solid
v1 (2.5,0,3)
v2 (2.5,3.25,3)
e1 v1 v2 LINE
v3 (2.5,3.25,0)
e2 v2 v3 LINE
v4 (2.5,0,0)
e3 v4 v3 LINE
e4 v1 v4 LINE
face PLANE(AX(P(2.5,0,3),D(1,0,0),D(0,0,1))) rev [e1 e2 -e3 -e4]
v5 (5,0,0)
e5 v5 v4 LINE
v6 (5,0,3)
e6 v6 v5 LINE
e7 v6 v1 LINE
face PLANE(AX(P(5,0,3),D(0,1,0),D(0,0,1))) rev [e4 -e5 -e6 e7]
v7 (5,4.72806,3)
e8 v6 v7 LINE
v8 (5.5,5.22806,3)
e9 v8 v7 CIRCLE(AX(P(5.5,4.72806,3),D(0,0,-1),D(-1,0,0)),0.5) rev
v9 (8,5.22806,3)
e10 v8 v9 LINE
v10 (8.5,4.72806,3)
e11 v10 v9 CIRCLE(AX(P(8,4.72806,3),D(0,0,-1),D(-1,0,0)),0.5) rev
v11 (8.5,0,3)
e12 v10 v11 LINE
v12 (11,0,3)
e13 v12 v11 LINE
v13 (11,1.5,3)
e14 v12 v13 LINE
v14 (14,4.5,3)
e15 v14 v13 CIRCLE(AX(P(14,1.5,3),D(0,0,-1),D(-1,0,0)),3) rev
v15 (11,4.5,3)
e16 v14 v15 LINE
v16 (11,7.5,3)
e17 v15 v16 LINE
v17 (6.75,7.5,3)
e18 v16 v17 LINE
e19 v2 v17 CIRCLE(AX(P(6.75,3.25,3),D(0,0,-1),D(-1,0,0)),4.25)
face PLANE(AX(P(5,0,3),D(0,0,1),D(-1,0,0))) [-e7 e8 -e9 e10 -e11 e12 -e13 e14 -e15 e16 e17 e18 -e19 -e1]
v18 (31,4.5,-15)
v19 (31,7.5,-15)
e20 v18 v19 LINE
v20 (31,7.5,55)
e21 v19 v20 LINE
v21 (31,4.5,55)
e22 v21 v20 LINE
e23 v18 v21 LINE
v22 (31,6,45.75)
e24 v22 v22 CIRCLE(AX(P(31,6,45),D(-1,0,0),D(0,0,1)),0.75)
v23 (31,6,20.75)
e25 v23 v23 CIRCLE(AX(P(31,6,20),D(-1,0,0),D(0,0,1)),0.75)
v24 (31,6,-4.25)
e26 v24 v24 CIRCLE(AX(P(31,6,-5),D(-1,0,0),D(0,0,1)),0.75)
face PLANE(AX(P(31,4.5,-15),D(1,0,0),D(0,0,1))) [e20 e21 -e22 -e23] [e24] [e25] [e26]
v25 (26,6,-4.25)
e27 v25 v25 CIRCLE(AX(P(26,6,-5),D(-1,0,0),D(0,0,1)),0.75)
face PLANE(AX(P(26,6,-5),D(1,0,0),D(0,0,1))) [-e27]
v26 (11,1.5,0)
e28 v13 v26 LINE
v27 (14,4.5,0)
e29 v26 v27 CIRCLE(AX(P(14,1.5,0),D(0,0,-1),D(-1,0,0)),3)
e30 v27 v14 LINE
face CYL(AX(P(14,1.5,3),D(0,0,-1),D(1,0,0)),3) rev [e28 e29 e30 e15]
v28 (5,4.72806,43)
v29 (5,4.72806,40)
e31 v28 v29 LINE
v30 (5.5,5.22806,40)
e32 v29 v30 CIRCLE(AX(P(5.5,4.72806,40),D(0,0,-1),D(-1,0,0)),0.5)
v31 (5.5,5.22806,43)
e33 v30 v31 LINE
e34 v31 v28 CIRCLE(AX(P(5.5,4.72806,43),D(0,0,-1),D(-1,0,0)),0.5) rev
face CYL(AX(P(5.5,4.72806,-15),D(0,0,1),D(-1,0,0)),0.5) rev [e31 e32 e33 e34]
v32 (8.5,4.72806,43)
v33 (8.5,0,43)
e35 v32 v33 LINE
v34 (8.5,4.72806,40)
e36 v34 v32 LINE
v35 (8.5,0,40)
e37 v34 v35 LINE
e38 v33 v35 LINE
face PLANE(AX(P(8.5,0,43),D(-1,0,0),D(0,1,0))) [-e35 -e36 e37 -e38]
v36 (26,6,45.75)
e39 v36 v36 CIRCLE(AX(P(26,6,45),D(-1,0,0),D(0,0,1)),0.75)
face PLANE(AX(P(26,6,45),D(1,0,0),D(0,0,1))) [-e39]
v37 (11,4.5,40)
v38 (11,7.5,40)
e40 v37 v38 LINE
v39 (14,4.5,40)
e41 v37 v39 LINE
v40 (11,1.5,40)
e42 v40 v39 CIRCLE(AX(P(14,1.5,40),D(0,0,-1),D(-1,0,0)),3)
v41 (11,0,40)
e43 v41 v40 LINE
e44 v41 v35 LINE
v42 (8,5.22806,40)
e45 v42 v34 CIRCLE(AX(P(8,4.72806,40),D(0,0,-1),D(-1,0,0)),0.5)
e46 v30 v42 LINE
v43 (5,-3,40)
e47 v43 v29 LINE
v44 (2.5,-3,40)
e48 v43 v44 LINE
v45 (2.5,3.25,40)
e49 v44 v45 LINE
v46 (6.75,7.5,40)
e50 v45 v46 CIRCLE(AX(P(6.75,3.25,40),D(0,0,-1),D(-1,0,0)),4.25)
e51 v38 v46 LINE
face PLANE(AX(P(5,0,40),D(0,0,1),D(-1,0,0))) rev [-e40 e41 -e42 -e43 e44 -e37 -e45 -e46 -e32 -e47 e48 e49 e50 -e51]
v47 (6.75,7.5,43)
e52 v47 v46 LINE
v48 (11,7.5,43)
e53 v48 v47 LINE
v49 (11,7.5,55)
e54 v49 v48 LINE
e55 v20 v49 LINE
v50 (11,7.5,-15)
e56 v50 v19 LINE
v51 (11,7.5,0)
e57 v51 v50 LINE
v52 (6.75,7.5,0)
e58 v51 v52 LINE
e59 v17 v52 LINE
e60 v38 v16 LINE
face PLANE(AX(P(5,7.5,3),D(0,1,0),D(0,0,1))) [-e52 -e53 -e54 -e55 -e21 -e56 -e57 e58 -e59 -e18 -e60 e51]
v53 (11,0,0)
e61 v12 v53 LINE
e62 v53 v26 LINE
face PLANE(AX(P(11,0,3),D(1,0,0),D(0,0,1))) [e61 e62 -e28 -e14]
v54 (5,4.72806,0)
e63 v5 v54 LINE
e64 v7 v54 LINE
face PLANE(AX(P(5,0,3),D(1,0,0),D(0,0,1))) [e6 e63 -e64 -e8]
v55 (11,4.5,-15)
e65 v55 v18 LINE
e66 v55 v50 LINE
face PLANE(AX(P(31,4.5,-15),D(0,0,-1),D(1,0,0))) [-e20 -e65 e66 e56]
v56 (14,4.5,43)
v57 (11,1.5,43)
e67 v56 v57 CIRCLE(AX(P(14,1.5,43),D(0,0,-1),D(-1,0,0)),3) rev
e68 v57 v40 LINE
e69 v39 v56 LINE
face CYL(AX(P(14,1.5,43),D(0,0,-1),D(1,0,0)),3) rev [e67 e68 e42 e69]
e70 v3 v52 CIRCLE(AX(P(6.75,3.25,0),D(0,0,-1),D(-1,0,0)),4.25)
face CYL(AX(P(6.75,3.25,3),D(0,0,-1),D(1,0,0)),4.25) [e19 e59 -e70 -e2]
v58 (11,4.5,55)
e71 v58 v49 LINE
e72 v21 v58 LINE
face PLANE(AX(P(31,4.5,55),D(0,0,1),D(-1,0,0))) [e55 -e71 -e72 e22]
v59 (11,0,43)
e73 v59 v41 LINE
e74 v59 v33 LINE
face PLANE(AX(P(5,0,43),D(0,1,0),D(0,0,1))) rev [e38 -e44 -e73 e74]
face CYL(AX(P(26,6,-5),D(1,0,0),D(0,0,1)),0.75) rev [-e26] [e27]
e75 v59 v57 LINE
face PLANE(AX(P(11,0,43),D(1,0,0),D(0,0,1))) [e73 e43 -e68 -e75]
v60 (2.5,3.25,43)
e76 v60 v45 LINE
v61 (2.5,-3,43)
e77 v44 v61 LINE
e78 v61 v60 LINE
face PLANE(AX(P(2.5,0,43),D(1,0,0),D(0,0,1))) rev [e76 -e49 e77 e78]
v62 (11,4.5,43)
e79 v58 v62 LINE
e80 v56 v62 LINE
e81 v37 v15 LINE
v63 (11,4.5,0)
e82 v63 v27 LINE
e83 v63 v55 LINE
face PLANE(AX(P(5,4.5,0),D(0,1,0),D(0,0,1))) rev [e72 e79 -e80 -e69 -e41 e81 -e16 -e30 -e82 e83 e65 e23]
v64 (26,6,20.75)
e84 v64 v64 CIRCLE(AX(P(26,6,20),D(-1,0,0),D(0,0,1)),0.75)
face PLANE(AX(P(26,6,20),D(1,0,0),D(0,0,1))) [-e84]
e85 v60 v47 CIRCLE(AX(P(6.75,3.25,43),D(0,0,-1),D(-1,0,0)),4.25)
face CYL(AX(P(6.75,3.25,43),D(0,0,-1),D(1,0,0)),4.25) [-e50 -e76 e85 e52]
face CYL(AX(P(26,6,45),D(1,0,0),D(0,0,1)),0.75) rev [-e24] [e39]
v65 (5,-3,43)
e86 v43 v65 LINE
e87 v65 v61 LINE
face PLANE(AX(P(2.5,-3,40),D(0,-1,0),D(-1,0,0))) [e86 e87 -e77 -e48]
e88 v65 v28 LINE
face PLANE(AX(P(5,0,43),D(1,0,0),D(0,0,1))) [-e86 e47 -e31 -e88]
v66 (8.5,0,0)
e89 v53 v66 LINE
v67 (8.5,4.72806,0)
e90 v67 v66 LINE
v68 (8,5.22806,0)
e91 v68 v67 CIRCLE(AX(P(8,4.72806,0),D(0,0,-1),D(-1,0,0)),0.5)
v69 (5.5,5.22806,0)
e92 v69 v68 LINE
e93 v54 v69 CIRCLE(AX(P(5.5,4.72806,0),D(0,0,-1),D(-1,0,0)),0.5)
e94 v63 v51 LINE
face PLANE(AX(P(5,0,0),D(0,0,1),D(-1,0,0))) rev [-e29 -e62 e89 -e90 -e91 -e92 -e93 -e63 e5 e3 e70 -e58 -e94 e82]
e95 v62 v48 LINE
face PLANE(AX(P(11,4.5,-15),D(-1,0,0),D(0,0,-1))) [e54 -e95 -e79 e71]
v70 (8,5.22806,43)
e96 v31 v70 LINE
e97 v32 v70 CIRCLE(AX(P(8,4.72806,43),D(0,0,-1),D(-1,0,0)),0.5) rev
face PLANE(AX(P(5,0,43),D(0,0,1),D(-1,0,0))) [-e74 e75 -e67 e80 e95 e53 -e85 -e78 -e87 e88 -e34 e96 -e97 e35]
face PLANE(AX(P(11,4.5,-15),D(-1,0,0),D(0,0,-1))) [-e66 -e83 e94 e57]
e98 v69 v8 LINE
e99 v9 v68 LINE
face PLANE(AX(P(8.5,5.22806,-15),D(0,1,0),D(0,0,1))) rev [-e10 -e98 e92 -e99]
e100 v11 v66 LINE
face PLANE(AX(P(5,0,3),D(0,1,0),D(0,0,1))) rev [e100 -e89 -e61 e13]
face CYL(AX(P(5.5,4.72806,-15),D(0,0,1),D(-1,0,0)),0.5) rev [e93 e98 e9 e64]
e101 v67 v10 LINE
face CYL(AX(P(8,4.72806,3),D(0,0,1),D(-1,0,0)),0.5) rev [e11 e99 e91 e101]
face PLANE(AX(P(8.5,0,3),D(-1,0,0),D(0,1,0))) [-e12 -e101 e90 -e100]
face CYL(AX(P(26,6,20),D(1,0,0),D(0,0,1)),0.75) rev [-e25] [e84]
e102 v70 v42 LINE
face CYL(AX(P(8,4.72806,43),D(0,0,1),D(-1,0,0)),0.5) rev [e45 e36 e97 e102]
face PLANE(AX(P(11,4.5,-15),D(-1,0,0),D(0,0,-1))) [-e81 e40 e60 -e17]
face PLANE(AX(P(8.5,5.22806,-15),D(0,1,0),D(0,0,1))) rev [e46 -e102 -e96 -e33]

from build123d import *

# Parameters (mm, degrees)
BOSS_EXTRUDE1_DEPTH      = 3
LPATTERN1_COUNT          = 2
LPATTERN1_PITCH          = 40
SKETCH2_W                = 20
SKETCH2_H                = 70
BOSS_EXTRUDE2_DEPTH      = 3
FILLET1_R                = 3
BOSS_EXTRUDE3_DEPTH      = 3
FILLET2_START            = -1
FILLET2_DEPTH            = 5
FILLET3_DEPTH            = 3
BOSS_EXTRUDE5_REACH      = 65.784
BOSS_EXTRUDE5_END_RADIUS = 10.25
SKETCH5_R                = 1.5
LPATTERN2_START          = 7.5
LPATTERN2_OUTLINE_R      = 1.5
LPATTERN2_DEPTH          = 1.302234895
LPATTERN2_START_2        = 8.802234895
LPATTERN2_2_OUTLINE_R    = 1.5
LPATTERN2_2_DEPTH        = 2.539759791
LPATTERN2_START_3        = 39
LPATTERN2_3_DEPTH        = 5
LPATTERN2_4_OUTLINE_R    = 1.5
LPATTERN2_4_DEPTH        = 1.302235223
LPATTERN2_START_4        = 8.802235223
LPATTERN2_5_OUTLINE_R    = 1.5
LPATTERN2_5_DEPTH        = 2.539761855
LPATTERN2_6_OUTLINE_W    = 10.25
LPATTERN2_6_OUTLINE_H    = 3.000220265
LPATTERN2_6_ANGLE        = 22.115218
LPATTERN2_START_5        = 40
LPATTERN2_7_DEPTH        = 3
CUT_EXTRUDE2_DEPTH       = 64.922422006
CUT_EXTRUDE2_DEPTH_BACK  = 64.922422006
SKETCH6_W                = 3.5
SKETCH6_H                = 1.978060381
FILLET4_R                = 0.5
SKETCH7_W                = 2.5
SKETCH7_H                = 3
BOSS_EXTRUDE6_DEPTH      = 3
SKETCH8_R                = 0.75
CUT_EXTRUDE3_DEPTH       = 5
MIRROR1_START            = -4.25
MIRROR1_OUTLINE_W        = 20
MIRROR1_OUTLINE_H        = 3
MIRROR1_DEPTH            = 23.4999999
MIRROR1_START_2          = 20.75
MIRROR1_2_OUTLINE_W      = 20
MIRROR1_2_OUTLINE_H      = 3
MIRROR1_2_DEPTH          = 23.4999999
MIRROR1_START_3          = 45.75
MIRROR1_3_OUTLINE_W      = 20
MIRROR1_3_OUTLINE_H      = 3
MIRROR1_3_DEPTH          = 9.25
MIRROR1_START_4          = -15
MIRROR1_4_OUTLINE_W      = 20
MIRROR1_4_OUTLINE_H      = 3
MIRROR1_4_DEPTH          = 9.2499999
MIRROR1_START_5          = 40
MIRROR1_5_DEPTH          = 3
MIRROR1_6_DEPTH          = 3
MIRROR1_START_6          = 11
MIRROR1_7_OUTLINE_W      = 3
MIRROR1_7_OUTLINE_H      = 1.5000001
MIRROR1_7_DEPTH          = 15
MIRROR1_START_7          = 26
MIRROR1_8_DEPTH          = 5
MIRROR1_START_8          = 7.5
MIRROR1_9_OUTLINE_R      = 1.5
MIRROR1_9_DEPTH          = 1.302234895
MIRROR1_START_9          = 8.802234895
MIRROR1_10_OUTLINE_R     = 1.5
MIRROR1_10_DEPTH         = 2.539759791
MIRROR1_START_10         = -1
MIRROR1_11_DEPTH         = 5
MIRROR1_12_OUTLINE_R     = 1.5
MIRROR1_12_DEPTH         = 1.302235223
MIRROR1_START_11         = 8.802235223
MIRROR1_13_OUTLINE_R     = 1.5
MIRROR1_13_DEPTH         = 2.539761855
MIRROR1_14_OUTLINE_W     = 10.25
MIRROR1_14_OUTLINE_H     = 3.000220265
MIRROR1_14_ANGLE         = 22.115218
MIRROR1_15_DEPTH         = 3
MIRROR1_16_OUTLINE_R     = 1.5
MIRROR1_16_DEPTH         = 1.302234895
MIRROR1_17_OUTLINE_R     = 1.5
MIRROR1_17_DEPTH         = 2.539759791
MIRROR1_START_12         = 39
MIRROR1_18_DEPTH         = 5
MIRROR1_19_DEPTH         = 3
MIRROR1_20_OUTLINE_R     = 1.5
MIRROR1_20_DEPTH         = 1.302235223
MIRROR1_21_OUTLINE_R     = 1.5
MIRROR1_21_DEPTH         = 2.539761855
MIRROR1_22_OUTLINE_W     = 10.25
MIRROR1_22_OUTLINE_H     = 3.000220265
MIRROR1_22_ANGLE         = 22.115218
CUT_EXTRUDE4_DEPTH       = 82.052921206
CUT_EXTRUDE4_DEPTH_BACK  = 82.052921206
SKETCH9_W                = 31.619894417
SKETCH9_H                = 19.739229587


with BuildPart() as part:
    # Sketch1 → Boss-Extrude1 (new body)
    with BuildSketch(Plane.XY):
        with BuildLine():
            Line((0, 3.25), (0, 0))
            Line((0, 0), (2.5, 0))
            Line((2.5, 0), (2.5, 3.25))
            ThreePointArc((2.5, 3.25), (1.25520382, 6.25520382), (-1.75, 7.5))
            Line((-1.75, 7.5), (-6, 7.5))
            Line((-6, 7.5), (-6, 3.25))
            Line((-6, 3.25), (-6, 0))
            Line((-6, 0), (-3.5, 0))
            Line((-3.5, 0), (-3.5, 3.25))
            ThreePointArc((-3.5, 3.25), (-1.75, 5), (0, 3.25))
        make_face()
    extrude(amount=BOSS_EXTRUDE1_DEPTH)


with BuildPart() as lpattern1_1:
    # LPattern1: pattern copy
    add(part.part.moved(Location(Vector(0, 0, 1) * (1 * LPATTERN1_PITCH))))


with BuildPart() as part_1:
    add(part.part)

    add(lpattern1_1.part)  # Boss-Extrude2 merges LPattern1_1
    # Sketch2 → Boss-Extrude2 (add)
    with BuildSketch(Plane(origin=(0, 7.5, 0), x_dir=(1, 0, 0), z_dir=(0, 1, 0))):
        with Locations((-16, -20)):
            Rectangle(SKETCH2_W, SKETCH2_H)
    extrude(amount=-BOSS_EXTRUDE2_DEPTH)

    # Fillet1
    fillet1_edges = [part_1.edges().sort_by_distance(p)[0] for p in [
        (-6, 4.5, 1.5),
        (-6, 4.5, 41.5),
    ]]
    fillet(fillet1_edges, radius=FILLET1_R)

    # Sketch6 → Cut-Extrude2 (cut, two sides: drawn at the far end of the back side and taken through both)
    with BuildSketch(Plane.XY.offset(3).offset(-CUT_EXTRUDE2_DEPTH_BACK)):
        with Locations((-1.75, 4.239030191)):
            Rectangle(SKETCH6_W, SKETCH6_H)
    extrude(amount=CUT_EXTRUDE2_DEPTH + CUT_EXTRUDE2_DEPTH_BACK, mode=Mode.SUBTRACT)

    # Fillet4
    fillet4_edges = [part_1.edges().sort_by_distance(p)[0] for p in [
        (-3.5, 5.228060381, 1.5),
        (-3.5, 5.228060381, 41.5),
        (0, 5.228060381, 1.5),
        (0, 5.228060381, 41.5),
    ]]
    fillet(fillet4_edges, radius=FILLET4_R)

    # Sketch7 → Boss-Extrude6 (add)
    with BuildSketch(Plane.XY.offset(43)):
        with Locations((1.25, -1.5)):
            Rectangle(SKETCH7_W, SKETCH7_H)
    extrude(amount=-BOSS_EXTRUDE6_DEPTH)

    # Sketch8 → Cut-Extrude3 (cut)
    with BuildSketch(Plane.ZY.offset(26)):
        with Locations((-5, 6)):
            Circle(SKETCH8_R)
        with Locations((20, 6)):
            Circle(SKETCH8_R)
        with Locations((45, 6)):
            Circle(SKETCH8_R)
    extrude(amount=-CUT_EXTRUDE3_DEPTH, mode=Mode.SUBTRACT)


with BuildPart() as body_2:
    # Sketch4 → Boss-Extrude3 (new body)
    with BuildSketch(Plane.XY.offset(3)):
        with BuildLine():
            Line((-20.857798696, 25.621740076), (-21.206324936, 26.579308051))
            ThreePointArc((-21.206324936, 26.579308051), (-16.672163531, 7.522062955), (-9.682947675, 25.822010278))
            Line((-9.682947675, 25.822010278), (-10.11803023, 24.888972729))
            ThreePointArc((-10.11803023, 24.888972729), (-16.629657521, 8.521455618), (-20.857798696, 25.621740076))
        make_face()
    extrude(amount=-BOSS_EXTRUDE3_DEPTH)

    # Fillet2: read off the stored shape, not the designer's step
    # Fillet2 outline → Fillet2 (cut)
    with BuildSketch(Plane.XY.offset(FILLET2_START)):
        with BuildLine():
            add(Edge.make_bspline(
                [(-20.994076432, 25.996160077), (-21.074153595, 26.216170321), (-21.251523965, 26.350710286), (-21.454646821, 26.373043505), (-21.624101617, 26.320471493), (-21.744123922, 26.239260296)],
                knots=[0.438237279, 0.438237279, 0.438237279, 0.438237279, 0.438237279, 0.438237279, 1, 1, 1, 1, 1, 1], degree=5, weights=[0.507629267, 0.479872472, 0.515231147, 0.613705294, 0.775294911, 1]))
            Line((-20.994076432, 25.996160077), (-21.206324936, 26.579308051))
            ThreePointArc((-21.206324936, 26.579308051), (-21.477863695, 26.413458278), (-21.744123922, 26.239260296))
        make_face()
        with BuildLine():
            add(Edge.make_bspline(
                [(-21.183721588, 25.411039779), (-21.095700521, 25.470597844), (-21.011417818, 25.561339411), (-20.949957611, 25.687250869), (-20.937439038, 25.840550084), (-20.994076432, 25.996160077)],
                knots=[0, 0, 0, 0, 0, 0, 0.438237279, 0.438237279, 0.438237279, 0.438237279, 0.438237279, 0.438237279], degree=5, weights=[1, 0.824705088, 0.687820559, 0.589346413, 0.529282649, 0.507629267]))
            ThreePointArc((-21.183721588, 25.411039779), (-21.021865296, 25.518099442), (-20.857798696, 25.621740076))
            Line((-20.857798696, 25.621740076), (-20.994076432, 25.996160077))
        make_face()
    extrude(amount=FILLET2_DEPTH, mode=Mode.SUBTRACT)

    # Fillet3: read off the stored shape, not the designer's step
    # Fillet3 outline → Fillet3 (cut)
    with BuildSketch(Plane.XY):
        with BuildLine():
            add(Edge.make_bspline(
                [(-9.171518011, 25.394235327), (-9.282578146, 25.493443697), (-9.44922289, 25.569577268), (-9.660410728, 25.570842005), (-9.856114015, 25.450653826), (-9.957768573, 25.23265496)],
                knots=[0, 0, 0, 0, 0, 0, 0.573717386, 0.573717386, 0.573717386, 0.573717386, 0.573717386, 0.573717386], degree=5, weights=[1, 0.770513046, 0.606856419, 0.50903012, 0.477034149, 0.510868506]))
            ThreePointArc((-9.171518011, 25.394235327), (-9.423753658, 25.612282369), (-9.682947675, 25.822010278))
            Line((-9.682947675, 25.822010278), (-9.957768573, 25.23265496))
        make_face()
        with BuildLine():
            add(Edge.make_bspline(
                [(-9.957768573, 25.23265496), (-10.024989519, 25.088499201), (-10.028130695, 24.940896848), (-9.983698166, 24.813907164), (-9.914364214, 24.716929113), (-9.837711376, 24.648456271)],
                knots=[0.573717386, 0.573717386, 0.573717386, 0.573717386, 0.573717386, 0.573717386, 1, 1, 1, 1, 1, 1], degree=5, weights=[0.510868506, 0.536008058, 0.597490983, 0.695317282, 0.829486954, 1]))
            Line((-9.957768573, 25.23265496), (-10.11803023, 24.888972729))
            ThreePointArc((-10.11803023, 24.888972729), (-9.976670181, 24.770113809), (-9.837711376, 24.648456271))
        make_face()
    extrude(amount=FILLET3_DEPTH, mode=Mode.SUBTRACT)


with BuildPart() as body_3:
    # Boss-Extrude5: up to this cylinder (the profile starts outside it)
    boss_extrude5_end = Plane(origin=(-16, 17.75, 1.5), z_dir=(0, 0, 1)) * Cylinder(BOSS_EXTRUDE5_END_RADIUS, 153.068, mode=Mode.PRIVATE)
    # Sketch5 → Boss-Extrude5 (new, up to the surface)
    with BuildSketch(Plane(origin=(0, 7.5, 0), x_dir=(1, 0, 0), z_dir=(0, 1, 0)), mode=Mode.PRIVATE) as boss_extrude5_sk1:
        with Locations(Location((-22.5, -1.5, 0), (0, 0, 90))):
            Circle(SKETCH5_R)
    boss_extrude5_tool1 = extrude(boss_extrude5_sk1.sketch, amount=BOSS_EXTRUDE5_REACH, mode=Mode.PRIVATE) - boss_extrude5_end
    add(boss_extrude5_tool1.solids().sort_by_distance((-22.5, 7.5, 1.5))[0])
    # Sketch5 → Boss-Extrude5 (new, up to the surface)
    with BuildSketch(Plane(origin=(0, 7.5, 0), x_dir=(1, 0, 0), z_dir=(0, 1, 0)), mode=Mode.PRIVATE) as boss_extrude5_sk2:
        with Locations(Location((-9.5, -1.5, 0), (0, 0, 90))):
            Circle(SKETCH5_R)
    boss_extrude5_tool2 = extrude(boss_extrude5_sk2.sketch, amount=BOSS_EXTRUDE5_REACH, mode=Mode.PRIVATE) - boss_extrude5_end
    add(boss_extrude5_tool2.solids().sort_by_distance((-9.5, 7.5, 1.5))[0])


with BuildPart() as body_4:
    # LPattern2: read off the stored shape, not the designer's step
    # LPattern2 outline → LPattern2 (new body)
    with BuildSketch(Plane(origin=(0, 0, 0), x_dir=(1, 0, 0), z_dir=(0, 1, 0)).offset(LPATTERN2_START)):
        with Locations((-22.5, -41.5)):
            Circle(LPATTERN2_OUTLINE_R)
    extrude(amount=LPATTERN2_DEPTH)

    # LPattern2 2 outline → LPattern2 2 (add)
    with BuildSketch(Plane(origin=(0, 0, 0), x_dir=(1, 0, 0), z_dir=(0, 1, 0)).offset(LPATTERN2_START_2)):
        with Locations((-22.5, -41.5)):
            Circle(LPATTERN2_2_OUTLINE_R)
    extrude(amount=LPATTERN2_2_DEPTH)

    # LPattern2 3 outline → LPattern2 3 (cut)
    with BuildSketch(Plane.XY.offset(LPATTERN2_START_3)):
        with BuildLine():
            Line((-20, 11.341994686), (-23.999998778, 11.341995665))
            ThreePointArc((-23.999998778, 11.341995665), (-22.622702211, 9.926809128), (-20.999584885, 8.802002963))
            Line((-20.999584885, 8.802002963), (-20, 8.243497024))
            Line((-20, 8.243497024), (-20, 11.341994686))
        make_face()
    extrude(amount=LPATTERN2_3_DEPTH, mode=Mode.SUBTRACT)


with BuildPart() as body_5:
    # LPattern2 4 outline → LPattern2 4 (new body)
    with BuildSketch(Plane(origin=(0, 0, 0), x_dir=(1, 0, 0), z_dir=(0, 1, 0)).offset(LPATTERN2_START)):
        with Locations((-9.5, -41.5)):
            Circle(LPATTERN2_4_OUTLINE_R)
    extrude(amount=LPATTERN2_4_DEPTH)

    # LPattern2 5 outline → LPattern2 5 (add)
    with BuildSketch(Plane(origin=(0, 0, 0), x_dir=(1, 0, 0), z_dir=(0, 1, 0)).offset(LPATTERN2_START_4)):
        with Locations((-9.5, -41.5)):
            Circle(LPATTERN2_5_OUTLINE_R)
    extrude(amount=LPATTERN2_5_DEPTH)

    # LPattern2 6 outline → LPattern2 6 (revolve, cut)
    with BuildSketch(Plane(origin=(-16, 17.75, 0), x_dir=(0.4877650283417417, -0.8729749579035929, 0), z_dir=(-0.8729749579035929, -0.4877650283417417, 0))):
        with Locations((5.125, 41.500109978)):
            Rectangle(LPATTERN2_6_OUTLINE_W, LPATTERN2_6_OUTLINE_H)
    revolve(axis=Axis((-16, 17.75, 0), (0, 0, 1)), revolution_arc=LPATTERN2_6_ANGLE, mode=Mode.SUBTRACT)


with BuildPart() as body_6:
    # LPattern2 7 outline → LPattern2 7 (new body)
    with BuildSketch(Plane.XY.offset(LPATTERN2_START_5)):
        with BuildLine():
            ThreePointArc((-21.744123922, 26.239260296), (-16.687368099, 7.523073526), (-9.171518011, 25.394235327))
            add(Edge.make_bspline(
                [(-9.171518011, 25.394235327), (-9.42011103, 25.616299782), (-9.897400645, 25.707435586), (-10.230497327, 25.334546058), (-10.086304395, 24.870520725), (-9.837711376, 24.648456271)],
                knots=[0, 0, 0, 0, 0, 0, 1, 1, 1, 1, 1, 1], degree=5, weights=[1, 0.6, 0.4, 0.4, 0.6, 1]))
            ThreePointArc((-9.837711376, 24.648456271), (-16.620307797, 8.520822451), (-21.183721588, 25.41103978))
            add(Edge.make_bspline(
                [(-21.183721588, 25.41103978), (-20.907648082, 25.597840557), (-20.702656783, 26.038396659), (-20.98285795, 26.452506918), (-21.468050416, 26.426061074), (-21.744123922, 26.239260296)],
                knots=[0, 0, 0, 0, 0, 0, 1, 1, 1, 1, 1, 1], degree=5, weights=[1, 0.6, 0.4, 0.4, 0.6, 1]))
        make_face()
    extrude(amount=LPATTERN2_7_DEPTH)


with BuildPart() as body_7:
    # Mirror1: read off the stored shape, not the designer's step
    # Mirror1 outline → Mirror1 (new body)
    with BuildSketch(Plane.XY.offset(MIRROR1_START)):
        with Locations((21, 6)):
            Rectangle(MIRROR1_OUTLINE_W, MIRROR1_OUTLINE_H)
    extrude(amount=MIRROR1_DEPTH)

    # Mirror1 2 outline → Mirror1 2 (add)
    with BuildSketch(Plane.XY.offset(MIRROR1_START_2)):
        with Locations((21, 6)):
            Rectangle(MIRROR1_2_OUTLINE_W, MIRROR1_2_OUTLINE_H)
    extrude(amount=MIRROR1_2_DEPTH)

    # Mirror1 3 outline → Mirror1 3 (add)
    with BuildSketch(Plane.XY.offset(MIRROR1_START_3)):
        with Locations((21, 6)):
            Rectangle(MIRROR1_3_OUTLINE_W, MIRROR1_3_OUTLINE_H)
    extrude(amount=MIRROR1_3_DEPTH)

    # Mirror1 4 outline → Mirror1 4 (add)
    with BuildSketch(Plane.XY.offset(MIRROR1_START_4)):
        with Locations((21, 6)):
            Rectangle(MIRROR1_4_OUTLINE_W, MIRROR1_4_OUTLINE_H)
    extrude(amount=MIRROR1_4_DEPTH)

    # Mirror1 5 outline → Mirror1 5 (add)
    with BuildSketch(Plane.XY.offset(MIRROR1_START_5)):
        with BuildLine():
            Line((11, 4.5), (11, 7.5))
            Line((11, 7.5), (6.75, 7.5))
            ThreePointArc((6.75, 7.5), (3.74479618, 6.25520382), (2.5, 3.25))
            Line((2.5, 3.25), (2.5, -3))
            Line((2.5, -3), (5, -3))
            Line((5, -3), (5, 4.728060381))
            ThreePointArc((5, 4.728060381), (5.146446609, 5.081613772), (5.5, 5.228060381))
            Line((5.5, 5.228060381), (8, 5.228060381))
            ThreePointArc((8, 5.228060381), (8.353553391, 5.081613772), (8.5, 4.728060381))
            Line((8.5, 4.728060381), (8.5, 0))
            Line((8.5, 0), (11, 0))
            Line((11, 0), (11, 1.5))
            ThreePointArc((11, 1.5), (11.878679656, 3.621320344), (14, 4.5))
            Line((14, 4.5), (11, 4.5))
        make_face()
    extrude(amount=MIRROR1_5_DEPTH)

    # Mirror1 6 outline → Mirror1 6 (add)
    with BuildSketch(Plane.XY):
        with BuildLine():
            Line((11, 4.5), (11, 7.5))
            Line((11, 7.5), (6.75, 7.5))
            ThreePointArc((6.75, 7.5), (3.74479618, 6.25520382), (2.5, 3.25))
            Line((2.5, 3.25), (2.5, 0))
            Line((2.5, 0), (5, 0))
            Line((5, 0), (5, 4.728060381))
            ThreePointArc((5, 4.728060381), (5.146446609, 5.081613772), (5.5, 5.228060381))
            Line((5.5, 5.228060381), (8, 5.228060381))
            ThreePointArc((8, 5.228060381), (8.353553391, 5.081613772), (8.5, 4.728060381))
            Line((8.5, 4.728060381), (8.5, 0))
            Line((8.5, 0), (11, 0))
            Line((11, 0), (11, 1.5))
            ThreePointArc((11, 1.5), (11.878679656, 3.621320344), (14, 4.5))
            Line((14, 4.5), (11, 4.5))
        make_face()
    extrude(amount=MIRROR1_6_DEPTH)

    # Mirror1 7 outline → Mirror1 7 (add)
    with BuildSketch(Plane.YZ.offset(MIRROR1_START_6)):
        with Locations((6, -5.00000005)):
            Rectangle(MIRROR1_7_OUTLINE_W, MIRROR1_7_OUTLINE_H)
        with Locations((6, 19.99999995)):
            Rectangle(MIRROR1_7_OUTLINE_W, MIRROR1_7_OUTLINE_H)
        with Locations((6, 44.99999995)):
            Rectangle(MIRROR1_7_OUTLINE_W, MIRROR1_7_OUTLINE_H)
    extrude(amount=MIRROR1_7_DEPTH)

    # Mirror1 8 outline → Mirror1 8 (add)
    with BuildSketch(Plane.YZ.offset(MIRROR1_START_7)):
        with BuildLine():
            Line((6, -5.75), (7.5, -5.7500001))
            Line((7.5, -5.7500001), (7.5, -4.25))
            Line((7.5, -4.25), (6, -4.25))
            ThreePointArc((6, -4.25), (6.75, -5), (6, -5.75))
        make_face()
        with BuildLine():
            Line((4.5, -5.7500001), (6, -5.75))
            ThreePointArc((6, -5.75), (5.25, -5), (6, -4.25))
            Line((6, -4.25), (4.5, -4.25))
            Line((4.5, -4.25), (4.5, -5.7500001))
        make_face()
        with BuildLine():
            Line((6, 19.25), (7.5, 19.2499999))
            Line((7.5, 19.2499999), (7.5, 20.75))
            Line((7.5, 20.75), (6, 20.75))
            ThreePointArc((6, 20.75), (6.75, 20), (6, 19.25))
        make_face()
        with BuildLine():
            Line((4.5, 19.2499999), (6, 19.25))
            ThreePointArc((6, 19.25), (5.25, 20), (6, 20.75))
            Line((6, 20.75), (4.5, 20.75))
            Line((4.5, 20.75), (4.5, 19.2499999))
        make_face()
        with BuildLine():
            Line((6, 44.25), (7.5, 44.2499999))
            Line((7.5, 44.2499999), (7.5, 45.75))
            Line((7.5, 45.75), (6, 45.75))
            ThreePointArc((6, 45.75), (6.75, 45), (6, 44.25))
        make_face()
        with BuildLine():
            Line((4.5, 44.2499999), (6, 44.25))
            ThreePointArc((6, 44.25), (5.25, 45), (6, 45.75))
            Line((6, 45.75), (4.5, 45.75))
            Line((4.5, 45.75), (4.5, 44.2499999))
        make_face()
    extrude(amount=MIRROR1_8_DEPTH)


with BuildPart() as body_8:
    # Mirror1 9 outline → Mirror1 9 (new body)
    with BuildSketch(Plane(origin=(0, 0, 0), x_dir=(1, 0, 0), z_dir=(0, 1, 0)).offset(MIRROR1_START_8)):
        with Locations((27.5, -1.5)):
            Circle(MIRROR1_9_OUTLINE_R)
    extrude(amount=MIRROR1_9_DEPTH)

    # Mirror1 10 outline → Mirror1 10 (add)
    with BuildSketch(Plane(origin=(0, 0, 0), x_dir=(1, 0, 0), z_dir=(0, 1, 0)).offset(MIRROR1_START_9)):
        with Locations((27.5, -1.5)):
            Circle(MIRROR1_10_OUTLINE_R)
    extrude(amount=MIRROR1_10_DEPTH)

    # Mirror1 11 outline → Mirror1 11 (cut)
    with BuildSketch(Plane.XY.offset(MIRROR1_START_10)):
        with BuildLine():
            Line((25, 8.243497024), (25.999584885, 8.802002963))
            ThreePointArc((25.999584885, 8.802002963), (27.622702211, 9.926809128), (28.999998778, 11.341995665))
            Line((28.999998778, 11.341995665), (25, 11.341994686))
            Line((25, 11.341994686), (25, 8.243497024))
        make_face()
    extrude(amount=MIRROR1_11_DEPTH, mode=Mode.SUBTRACT)


with BuildPart() as body_9:
    # Mirror1 12 outline → Mirror1 12 (new body)
    with BuildSketch(Plane(origin=(0, 0, 0), x_dir=(1, 0, 0), z_dir=(0, 1, 0)).offset(MIRROR1_START_8)):
        with Locations((14.5, -41.5)):
            Circle(MIRROR1_12_OUTLINE_R)
    extrude(amount=MIRROR1_12_DEPTH)

    # Mirror1 13 outline → Mirror1 13 (add)
    with BuildSketch(Plane(origin=(0, 0, 0), x_dir=(1, 0, 0), z_dir=(0, 1, 0)).offset(MIRROR1_START_11)):
        with Locations((14.5, -41.5)):
            Circle(MIRROR1_13_OUTLINE_R)
    extrude(amount=MIRROR1_13_DEPTH)

    # Mirror1 14 outline → Mirror1 14 (revolve, cut)
    with BuildSketch(Plane(origin=(21, 17.75, 0), x_dir=(-0.7805286813468162, -0.6251199705616516, 0), z_dir=(-0.6251199705616516, 0.7805286813468162, 0))):
        with Locations((5.125, 41.500109978)):
            Rectangle(MIRROR1_14_OUTLINE_W, MIRROR1_14_OUTLINE_H)
    revolve(axis=Axis((21, 17.75, 0), (0, 0, 1)), revolution_arc=MIRROR1_14_ANGLE, mode=Mode.SUBTRACT)


with BuildPart() as body_10:
    # Mirror1 15 outline → Mirror1 15 (new body)
    with BuildSketch(Plane.XY.offset(MIRROR1_START_5)):
        with BuildLine():
            add(Edge.make_bspline(
                [(14.171518011, 25.394235327), (14.42011103, 25.616299782), (14.897400645, 25.707435586), (15.230497327, 25.334546058), (15.086304395, 24.870520725), (14.837711376, 24.648456271)],
                knots=[0, 0, 0, 0, 0, 0, 1, 1, 1, 1, 1, 1], degree=5, weights=[1, 0.6, 0.4, 0.4, 0.6, 1]))
            ThreePointArc((14.171518011, 25.394235327), (21.687368099, 7.523073526), (26.744123922, 26.239260296))
            add(Edge.make_bspline(
                [(26.183721588, 25.411039779), (25.907648082, 25.597840557), (25.702656783, 26.038396659), (25.98285795, 26.452506918), (26.468050416, 26.426061074), (26.744123922, 26.239260296)],
                knots=[0, 0, 0, 0, 0, 0, 1, 1, 1, 1, 1, 1], degree=5, weights=[1, 0.6, 0.4, 0.4, 0.6, 1]))
            ThreePointArc((26.183721588, 25.411039779), (21.620307797, 8.520822451), (14.837711376, 24.648456271))
        make_face()
    extrude(amount=MIRROR1_15_DEPTH)


with BuildPart() as body_11:
    # Mirror1 16 outline → Mirror1 16 (new body)
    with BuildSketch(Plane(origin=(0, 0, 0), x_dir=(1, 0, 0), z_dir=(0, 1, 0)).offset(MIRROR1_START_8)):
        with Locations((27.5, -41.5)):
            Circle(MIRROR1_16_OUTLINE_R)
    extrude(amount=MIRROR1_16_DEPTH)

    # Mirror1 17 outline → Mirror1 17 (add)
    with BuildSketch(Plane(origin=(0, 0, 0), x_dir=(1, 0, 0), z_dir=(0, 1, 0)).offset(MIRROR1_START_9)):
        with Locations((27.5, -41.5)):
            Circle(MIRROR1_17_OUTLINE_R)
    extrude(amount=MIRROR1_17_DEPTH)

    # Mirror1 18 outline → Mirror1 18 (cut)
    with BuildSketch(Plane.XY.offset(MIRROR1_START_12)):
        with BuildLine():
            Line((25, 8.243497024), (25.999584885, 8.802002963))
            ThreePointArc((25.999584885, 8.802002963), (27.622702211, 9.926809128), (28.999998778, 11.341995665))
            Line((28.999998778, 11.341995665), (25, 11.341994686))
            Line((25, 11.341994686), (25, 8.243497024))
        make_face()
    extrude(amount=MIRROR1_18_DEPTH, mode=Mode.SUBTRACT)


with BuildPart() as body_12:
    # Mirror1 19 outline → Mirror1 19 (new body)
    with BuildSketch(Plane.XY):
        with BuildLine():
            add(Edge.make_bspline(
                [(14.171518011, 25.394235327), (14.42011103, 25.616299782), (14.897400645, 25.707435586), (15.230497327, 25.334546058), (15.086304395, 24.870520725), (14.837711376, 24.648456271)],
                knots=[0, 0, 0, 0, 0, 0, 1, 1, 1, 1, 1, 1], degree=5, weights=[1, 0.6, 0.4, 0.4, 0.6, 1]))
            ThreePointArc((14.171518011, 25.394235327), (21.687368099, 7.523073526), (26.744123922, 26.239260296))
            add(Edge.make_bspline(
                [(26.183721588, 25.411039779), (25.907648082, 25.597840557), (25.702656783, 26.038396659), (25.98285795, 26.452506918), (26.468050416, 26.426061074), (26.744123922, 26.239260296)],
                knots=[0, 0, 0, 0, 0, 0, 1, 1, 1, 1, 1, 1], degree=5, weights=[1, 0.6, 0.4, 0.4, 0.6, 1]))
            ThreePointArc((26.183721588, 25.411039779), (21.620307797, 8.520822451), (14.837711376, 24.648456271))
        make_face()
    extrude(amount=MIRROR1_19_DEPTH)


with BuildPart() as body_13:
    # Mirror1 20 outline → Mirror1 20 (new body)
    with BuildSketch(Plane(origin=(0, 0, 0), x_dir=(1, 0, 0), z_dir=(0, 1, 0)).offset(MIRROR1_START_8)):
        with Locations((14.5, -1.5)):
            Circle(MIRROR1_20_OUTLINE_R)
    extrude(amount=MIRROR1_20_DEPTH)

    # Mirror1 21 outline → Mirror1 21 (add)
    with BuildSketch(Plane(origin=(0, 0, 0), x_dir=(1, 0, 0), z_dir=(0, 1, 0)).offset(MIRROR1_START_11)):
        with Locations((14.5, -1.5)):
            Circle(MIRROR1_21_OUTLINE_R)
    extrude(amount=MIRROR1_21_DEPTH)

    # Mirror1 22 outline → Mirror1 22 (revolve, cut)
    with BuildSketch(Plane(origin=(21, 17.75, 0), x_dir=(-0.7805286813468165, -0.6251199705616513, 0), z_dir=(-0.6251199705616513, 0.7805286813468165, 0))):
        with Locations((5.125, 1.500109978)):
            Rectangle(MIRROR1_22_OUTLINE_W, MIRROR1_22_OUTLINE_H)
    revolve(axis=Axis((21, 17.75, 0), (0, 0, 1)), revolution_arc=MIRROR1_22_ANGLE, mode=Mode.SUBTRACT)


with BuildPart() as cut_extrude4_tool:
    # Sketch9 → Cut-Extrude4 (new, two sides: drawn at the far end of the back side and taken through both)
    with BuildSketch(Plane.XY.offset(55).offset(-CUT_EXTRUDE4_DEPTH_BACK)):
        with Locations((21.361201043, 17.369614794)):
            Rectangle(SKETCH9_W, SKETCH9_H)
    extrude(amount=CUT_EXTRUDE4_DEPTH + CUT_EXTRUDE4_DEPTH_BACK)


with BuildPart() as body_8_1:
    add(body_8.part)

    # Cut-Extrude4: cut by cut_extrude4_tool
    add(cut_extrude4_tool.part, mode=Mode.SUBTRACT)


with BuildPart() as body_9_1:
    add(body_9.part)

    # Cut-Extrude4: cut by cut_extrude4_tool
    add(cut_extrude4_tool.part, mode=Mode.SUBTRACT)


with BuildPart() as body_10_1:
    add(body_10.part)

    # Cut-Extrude4: cut by cut_extrude4_tool
    add(cut_extrude4_tool.part, mode=Mode.SUBTRACT)


with BuildPart() as body_11_1:
    add(body_11.part)

    # Cut-Extrude4: cut by cut_extrude4_tool
    add(cut_extrude4_tool.part, mode=Mode.SUBTRACT)


with BuildPart() as body_12_1:
    add(body_12.part)

    # Cut-Extrude4: cut by cut_extrude4_tool
    add(cut_extrude4_tool.part, mode=Mode.SUBTRACT)


with BuildPart() as body_13_1:
    add(body_13.part)

    # Cut-Extrude4: cut by cut_extrude4_tool
    add(cut_extrude4_tool.part, mode=Mode.SUBTRACT)


solid = body_7.part
